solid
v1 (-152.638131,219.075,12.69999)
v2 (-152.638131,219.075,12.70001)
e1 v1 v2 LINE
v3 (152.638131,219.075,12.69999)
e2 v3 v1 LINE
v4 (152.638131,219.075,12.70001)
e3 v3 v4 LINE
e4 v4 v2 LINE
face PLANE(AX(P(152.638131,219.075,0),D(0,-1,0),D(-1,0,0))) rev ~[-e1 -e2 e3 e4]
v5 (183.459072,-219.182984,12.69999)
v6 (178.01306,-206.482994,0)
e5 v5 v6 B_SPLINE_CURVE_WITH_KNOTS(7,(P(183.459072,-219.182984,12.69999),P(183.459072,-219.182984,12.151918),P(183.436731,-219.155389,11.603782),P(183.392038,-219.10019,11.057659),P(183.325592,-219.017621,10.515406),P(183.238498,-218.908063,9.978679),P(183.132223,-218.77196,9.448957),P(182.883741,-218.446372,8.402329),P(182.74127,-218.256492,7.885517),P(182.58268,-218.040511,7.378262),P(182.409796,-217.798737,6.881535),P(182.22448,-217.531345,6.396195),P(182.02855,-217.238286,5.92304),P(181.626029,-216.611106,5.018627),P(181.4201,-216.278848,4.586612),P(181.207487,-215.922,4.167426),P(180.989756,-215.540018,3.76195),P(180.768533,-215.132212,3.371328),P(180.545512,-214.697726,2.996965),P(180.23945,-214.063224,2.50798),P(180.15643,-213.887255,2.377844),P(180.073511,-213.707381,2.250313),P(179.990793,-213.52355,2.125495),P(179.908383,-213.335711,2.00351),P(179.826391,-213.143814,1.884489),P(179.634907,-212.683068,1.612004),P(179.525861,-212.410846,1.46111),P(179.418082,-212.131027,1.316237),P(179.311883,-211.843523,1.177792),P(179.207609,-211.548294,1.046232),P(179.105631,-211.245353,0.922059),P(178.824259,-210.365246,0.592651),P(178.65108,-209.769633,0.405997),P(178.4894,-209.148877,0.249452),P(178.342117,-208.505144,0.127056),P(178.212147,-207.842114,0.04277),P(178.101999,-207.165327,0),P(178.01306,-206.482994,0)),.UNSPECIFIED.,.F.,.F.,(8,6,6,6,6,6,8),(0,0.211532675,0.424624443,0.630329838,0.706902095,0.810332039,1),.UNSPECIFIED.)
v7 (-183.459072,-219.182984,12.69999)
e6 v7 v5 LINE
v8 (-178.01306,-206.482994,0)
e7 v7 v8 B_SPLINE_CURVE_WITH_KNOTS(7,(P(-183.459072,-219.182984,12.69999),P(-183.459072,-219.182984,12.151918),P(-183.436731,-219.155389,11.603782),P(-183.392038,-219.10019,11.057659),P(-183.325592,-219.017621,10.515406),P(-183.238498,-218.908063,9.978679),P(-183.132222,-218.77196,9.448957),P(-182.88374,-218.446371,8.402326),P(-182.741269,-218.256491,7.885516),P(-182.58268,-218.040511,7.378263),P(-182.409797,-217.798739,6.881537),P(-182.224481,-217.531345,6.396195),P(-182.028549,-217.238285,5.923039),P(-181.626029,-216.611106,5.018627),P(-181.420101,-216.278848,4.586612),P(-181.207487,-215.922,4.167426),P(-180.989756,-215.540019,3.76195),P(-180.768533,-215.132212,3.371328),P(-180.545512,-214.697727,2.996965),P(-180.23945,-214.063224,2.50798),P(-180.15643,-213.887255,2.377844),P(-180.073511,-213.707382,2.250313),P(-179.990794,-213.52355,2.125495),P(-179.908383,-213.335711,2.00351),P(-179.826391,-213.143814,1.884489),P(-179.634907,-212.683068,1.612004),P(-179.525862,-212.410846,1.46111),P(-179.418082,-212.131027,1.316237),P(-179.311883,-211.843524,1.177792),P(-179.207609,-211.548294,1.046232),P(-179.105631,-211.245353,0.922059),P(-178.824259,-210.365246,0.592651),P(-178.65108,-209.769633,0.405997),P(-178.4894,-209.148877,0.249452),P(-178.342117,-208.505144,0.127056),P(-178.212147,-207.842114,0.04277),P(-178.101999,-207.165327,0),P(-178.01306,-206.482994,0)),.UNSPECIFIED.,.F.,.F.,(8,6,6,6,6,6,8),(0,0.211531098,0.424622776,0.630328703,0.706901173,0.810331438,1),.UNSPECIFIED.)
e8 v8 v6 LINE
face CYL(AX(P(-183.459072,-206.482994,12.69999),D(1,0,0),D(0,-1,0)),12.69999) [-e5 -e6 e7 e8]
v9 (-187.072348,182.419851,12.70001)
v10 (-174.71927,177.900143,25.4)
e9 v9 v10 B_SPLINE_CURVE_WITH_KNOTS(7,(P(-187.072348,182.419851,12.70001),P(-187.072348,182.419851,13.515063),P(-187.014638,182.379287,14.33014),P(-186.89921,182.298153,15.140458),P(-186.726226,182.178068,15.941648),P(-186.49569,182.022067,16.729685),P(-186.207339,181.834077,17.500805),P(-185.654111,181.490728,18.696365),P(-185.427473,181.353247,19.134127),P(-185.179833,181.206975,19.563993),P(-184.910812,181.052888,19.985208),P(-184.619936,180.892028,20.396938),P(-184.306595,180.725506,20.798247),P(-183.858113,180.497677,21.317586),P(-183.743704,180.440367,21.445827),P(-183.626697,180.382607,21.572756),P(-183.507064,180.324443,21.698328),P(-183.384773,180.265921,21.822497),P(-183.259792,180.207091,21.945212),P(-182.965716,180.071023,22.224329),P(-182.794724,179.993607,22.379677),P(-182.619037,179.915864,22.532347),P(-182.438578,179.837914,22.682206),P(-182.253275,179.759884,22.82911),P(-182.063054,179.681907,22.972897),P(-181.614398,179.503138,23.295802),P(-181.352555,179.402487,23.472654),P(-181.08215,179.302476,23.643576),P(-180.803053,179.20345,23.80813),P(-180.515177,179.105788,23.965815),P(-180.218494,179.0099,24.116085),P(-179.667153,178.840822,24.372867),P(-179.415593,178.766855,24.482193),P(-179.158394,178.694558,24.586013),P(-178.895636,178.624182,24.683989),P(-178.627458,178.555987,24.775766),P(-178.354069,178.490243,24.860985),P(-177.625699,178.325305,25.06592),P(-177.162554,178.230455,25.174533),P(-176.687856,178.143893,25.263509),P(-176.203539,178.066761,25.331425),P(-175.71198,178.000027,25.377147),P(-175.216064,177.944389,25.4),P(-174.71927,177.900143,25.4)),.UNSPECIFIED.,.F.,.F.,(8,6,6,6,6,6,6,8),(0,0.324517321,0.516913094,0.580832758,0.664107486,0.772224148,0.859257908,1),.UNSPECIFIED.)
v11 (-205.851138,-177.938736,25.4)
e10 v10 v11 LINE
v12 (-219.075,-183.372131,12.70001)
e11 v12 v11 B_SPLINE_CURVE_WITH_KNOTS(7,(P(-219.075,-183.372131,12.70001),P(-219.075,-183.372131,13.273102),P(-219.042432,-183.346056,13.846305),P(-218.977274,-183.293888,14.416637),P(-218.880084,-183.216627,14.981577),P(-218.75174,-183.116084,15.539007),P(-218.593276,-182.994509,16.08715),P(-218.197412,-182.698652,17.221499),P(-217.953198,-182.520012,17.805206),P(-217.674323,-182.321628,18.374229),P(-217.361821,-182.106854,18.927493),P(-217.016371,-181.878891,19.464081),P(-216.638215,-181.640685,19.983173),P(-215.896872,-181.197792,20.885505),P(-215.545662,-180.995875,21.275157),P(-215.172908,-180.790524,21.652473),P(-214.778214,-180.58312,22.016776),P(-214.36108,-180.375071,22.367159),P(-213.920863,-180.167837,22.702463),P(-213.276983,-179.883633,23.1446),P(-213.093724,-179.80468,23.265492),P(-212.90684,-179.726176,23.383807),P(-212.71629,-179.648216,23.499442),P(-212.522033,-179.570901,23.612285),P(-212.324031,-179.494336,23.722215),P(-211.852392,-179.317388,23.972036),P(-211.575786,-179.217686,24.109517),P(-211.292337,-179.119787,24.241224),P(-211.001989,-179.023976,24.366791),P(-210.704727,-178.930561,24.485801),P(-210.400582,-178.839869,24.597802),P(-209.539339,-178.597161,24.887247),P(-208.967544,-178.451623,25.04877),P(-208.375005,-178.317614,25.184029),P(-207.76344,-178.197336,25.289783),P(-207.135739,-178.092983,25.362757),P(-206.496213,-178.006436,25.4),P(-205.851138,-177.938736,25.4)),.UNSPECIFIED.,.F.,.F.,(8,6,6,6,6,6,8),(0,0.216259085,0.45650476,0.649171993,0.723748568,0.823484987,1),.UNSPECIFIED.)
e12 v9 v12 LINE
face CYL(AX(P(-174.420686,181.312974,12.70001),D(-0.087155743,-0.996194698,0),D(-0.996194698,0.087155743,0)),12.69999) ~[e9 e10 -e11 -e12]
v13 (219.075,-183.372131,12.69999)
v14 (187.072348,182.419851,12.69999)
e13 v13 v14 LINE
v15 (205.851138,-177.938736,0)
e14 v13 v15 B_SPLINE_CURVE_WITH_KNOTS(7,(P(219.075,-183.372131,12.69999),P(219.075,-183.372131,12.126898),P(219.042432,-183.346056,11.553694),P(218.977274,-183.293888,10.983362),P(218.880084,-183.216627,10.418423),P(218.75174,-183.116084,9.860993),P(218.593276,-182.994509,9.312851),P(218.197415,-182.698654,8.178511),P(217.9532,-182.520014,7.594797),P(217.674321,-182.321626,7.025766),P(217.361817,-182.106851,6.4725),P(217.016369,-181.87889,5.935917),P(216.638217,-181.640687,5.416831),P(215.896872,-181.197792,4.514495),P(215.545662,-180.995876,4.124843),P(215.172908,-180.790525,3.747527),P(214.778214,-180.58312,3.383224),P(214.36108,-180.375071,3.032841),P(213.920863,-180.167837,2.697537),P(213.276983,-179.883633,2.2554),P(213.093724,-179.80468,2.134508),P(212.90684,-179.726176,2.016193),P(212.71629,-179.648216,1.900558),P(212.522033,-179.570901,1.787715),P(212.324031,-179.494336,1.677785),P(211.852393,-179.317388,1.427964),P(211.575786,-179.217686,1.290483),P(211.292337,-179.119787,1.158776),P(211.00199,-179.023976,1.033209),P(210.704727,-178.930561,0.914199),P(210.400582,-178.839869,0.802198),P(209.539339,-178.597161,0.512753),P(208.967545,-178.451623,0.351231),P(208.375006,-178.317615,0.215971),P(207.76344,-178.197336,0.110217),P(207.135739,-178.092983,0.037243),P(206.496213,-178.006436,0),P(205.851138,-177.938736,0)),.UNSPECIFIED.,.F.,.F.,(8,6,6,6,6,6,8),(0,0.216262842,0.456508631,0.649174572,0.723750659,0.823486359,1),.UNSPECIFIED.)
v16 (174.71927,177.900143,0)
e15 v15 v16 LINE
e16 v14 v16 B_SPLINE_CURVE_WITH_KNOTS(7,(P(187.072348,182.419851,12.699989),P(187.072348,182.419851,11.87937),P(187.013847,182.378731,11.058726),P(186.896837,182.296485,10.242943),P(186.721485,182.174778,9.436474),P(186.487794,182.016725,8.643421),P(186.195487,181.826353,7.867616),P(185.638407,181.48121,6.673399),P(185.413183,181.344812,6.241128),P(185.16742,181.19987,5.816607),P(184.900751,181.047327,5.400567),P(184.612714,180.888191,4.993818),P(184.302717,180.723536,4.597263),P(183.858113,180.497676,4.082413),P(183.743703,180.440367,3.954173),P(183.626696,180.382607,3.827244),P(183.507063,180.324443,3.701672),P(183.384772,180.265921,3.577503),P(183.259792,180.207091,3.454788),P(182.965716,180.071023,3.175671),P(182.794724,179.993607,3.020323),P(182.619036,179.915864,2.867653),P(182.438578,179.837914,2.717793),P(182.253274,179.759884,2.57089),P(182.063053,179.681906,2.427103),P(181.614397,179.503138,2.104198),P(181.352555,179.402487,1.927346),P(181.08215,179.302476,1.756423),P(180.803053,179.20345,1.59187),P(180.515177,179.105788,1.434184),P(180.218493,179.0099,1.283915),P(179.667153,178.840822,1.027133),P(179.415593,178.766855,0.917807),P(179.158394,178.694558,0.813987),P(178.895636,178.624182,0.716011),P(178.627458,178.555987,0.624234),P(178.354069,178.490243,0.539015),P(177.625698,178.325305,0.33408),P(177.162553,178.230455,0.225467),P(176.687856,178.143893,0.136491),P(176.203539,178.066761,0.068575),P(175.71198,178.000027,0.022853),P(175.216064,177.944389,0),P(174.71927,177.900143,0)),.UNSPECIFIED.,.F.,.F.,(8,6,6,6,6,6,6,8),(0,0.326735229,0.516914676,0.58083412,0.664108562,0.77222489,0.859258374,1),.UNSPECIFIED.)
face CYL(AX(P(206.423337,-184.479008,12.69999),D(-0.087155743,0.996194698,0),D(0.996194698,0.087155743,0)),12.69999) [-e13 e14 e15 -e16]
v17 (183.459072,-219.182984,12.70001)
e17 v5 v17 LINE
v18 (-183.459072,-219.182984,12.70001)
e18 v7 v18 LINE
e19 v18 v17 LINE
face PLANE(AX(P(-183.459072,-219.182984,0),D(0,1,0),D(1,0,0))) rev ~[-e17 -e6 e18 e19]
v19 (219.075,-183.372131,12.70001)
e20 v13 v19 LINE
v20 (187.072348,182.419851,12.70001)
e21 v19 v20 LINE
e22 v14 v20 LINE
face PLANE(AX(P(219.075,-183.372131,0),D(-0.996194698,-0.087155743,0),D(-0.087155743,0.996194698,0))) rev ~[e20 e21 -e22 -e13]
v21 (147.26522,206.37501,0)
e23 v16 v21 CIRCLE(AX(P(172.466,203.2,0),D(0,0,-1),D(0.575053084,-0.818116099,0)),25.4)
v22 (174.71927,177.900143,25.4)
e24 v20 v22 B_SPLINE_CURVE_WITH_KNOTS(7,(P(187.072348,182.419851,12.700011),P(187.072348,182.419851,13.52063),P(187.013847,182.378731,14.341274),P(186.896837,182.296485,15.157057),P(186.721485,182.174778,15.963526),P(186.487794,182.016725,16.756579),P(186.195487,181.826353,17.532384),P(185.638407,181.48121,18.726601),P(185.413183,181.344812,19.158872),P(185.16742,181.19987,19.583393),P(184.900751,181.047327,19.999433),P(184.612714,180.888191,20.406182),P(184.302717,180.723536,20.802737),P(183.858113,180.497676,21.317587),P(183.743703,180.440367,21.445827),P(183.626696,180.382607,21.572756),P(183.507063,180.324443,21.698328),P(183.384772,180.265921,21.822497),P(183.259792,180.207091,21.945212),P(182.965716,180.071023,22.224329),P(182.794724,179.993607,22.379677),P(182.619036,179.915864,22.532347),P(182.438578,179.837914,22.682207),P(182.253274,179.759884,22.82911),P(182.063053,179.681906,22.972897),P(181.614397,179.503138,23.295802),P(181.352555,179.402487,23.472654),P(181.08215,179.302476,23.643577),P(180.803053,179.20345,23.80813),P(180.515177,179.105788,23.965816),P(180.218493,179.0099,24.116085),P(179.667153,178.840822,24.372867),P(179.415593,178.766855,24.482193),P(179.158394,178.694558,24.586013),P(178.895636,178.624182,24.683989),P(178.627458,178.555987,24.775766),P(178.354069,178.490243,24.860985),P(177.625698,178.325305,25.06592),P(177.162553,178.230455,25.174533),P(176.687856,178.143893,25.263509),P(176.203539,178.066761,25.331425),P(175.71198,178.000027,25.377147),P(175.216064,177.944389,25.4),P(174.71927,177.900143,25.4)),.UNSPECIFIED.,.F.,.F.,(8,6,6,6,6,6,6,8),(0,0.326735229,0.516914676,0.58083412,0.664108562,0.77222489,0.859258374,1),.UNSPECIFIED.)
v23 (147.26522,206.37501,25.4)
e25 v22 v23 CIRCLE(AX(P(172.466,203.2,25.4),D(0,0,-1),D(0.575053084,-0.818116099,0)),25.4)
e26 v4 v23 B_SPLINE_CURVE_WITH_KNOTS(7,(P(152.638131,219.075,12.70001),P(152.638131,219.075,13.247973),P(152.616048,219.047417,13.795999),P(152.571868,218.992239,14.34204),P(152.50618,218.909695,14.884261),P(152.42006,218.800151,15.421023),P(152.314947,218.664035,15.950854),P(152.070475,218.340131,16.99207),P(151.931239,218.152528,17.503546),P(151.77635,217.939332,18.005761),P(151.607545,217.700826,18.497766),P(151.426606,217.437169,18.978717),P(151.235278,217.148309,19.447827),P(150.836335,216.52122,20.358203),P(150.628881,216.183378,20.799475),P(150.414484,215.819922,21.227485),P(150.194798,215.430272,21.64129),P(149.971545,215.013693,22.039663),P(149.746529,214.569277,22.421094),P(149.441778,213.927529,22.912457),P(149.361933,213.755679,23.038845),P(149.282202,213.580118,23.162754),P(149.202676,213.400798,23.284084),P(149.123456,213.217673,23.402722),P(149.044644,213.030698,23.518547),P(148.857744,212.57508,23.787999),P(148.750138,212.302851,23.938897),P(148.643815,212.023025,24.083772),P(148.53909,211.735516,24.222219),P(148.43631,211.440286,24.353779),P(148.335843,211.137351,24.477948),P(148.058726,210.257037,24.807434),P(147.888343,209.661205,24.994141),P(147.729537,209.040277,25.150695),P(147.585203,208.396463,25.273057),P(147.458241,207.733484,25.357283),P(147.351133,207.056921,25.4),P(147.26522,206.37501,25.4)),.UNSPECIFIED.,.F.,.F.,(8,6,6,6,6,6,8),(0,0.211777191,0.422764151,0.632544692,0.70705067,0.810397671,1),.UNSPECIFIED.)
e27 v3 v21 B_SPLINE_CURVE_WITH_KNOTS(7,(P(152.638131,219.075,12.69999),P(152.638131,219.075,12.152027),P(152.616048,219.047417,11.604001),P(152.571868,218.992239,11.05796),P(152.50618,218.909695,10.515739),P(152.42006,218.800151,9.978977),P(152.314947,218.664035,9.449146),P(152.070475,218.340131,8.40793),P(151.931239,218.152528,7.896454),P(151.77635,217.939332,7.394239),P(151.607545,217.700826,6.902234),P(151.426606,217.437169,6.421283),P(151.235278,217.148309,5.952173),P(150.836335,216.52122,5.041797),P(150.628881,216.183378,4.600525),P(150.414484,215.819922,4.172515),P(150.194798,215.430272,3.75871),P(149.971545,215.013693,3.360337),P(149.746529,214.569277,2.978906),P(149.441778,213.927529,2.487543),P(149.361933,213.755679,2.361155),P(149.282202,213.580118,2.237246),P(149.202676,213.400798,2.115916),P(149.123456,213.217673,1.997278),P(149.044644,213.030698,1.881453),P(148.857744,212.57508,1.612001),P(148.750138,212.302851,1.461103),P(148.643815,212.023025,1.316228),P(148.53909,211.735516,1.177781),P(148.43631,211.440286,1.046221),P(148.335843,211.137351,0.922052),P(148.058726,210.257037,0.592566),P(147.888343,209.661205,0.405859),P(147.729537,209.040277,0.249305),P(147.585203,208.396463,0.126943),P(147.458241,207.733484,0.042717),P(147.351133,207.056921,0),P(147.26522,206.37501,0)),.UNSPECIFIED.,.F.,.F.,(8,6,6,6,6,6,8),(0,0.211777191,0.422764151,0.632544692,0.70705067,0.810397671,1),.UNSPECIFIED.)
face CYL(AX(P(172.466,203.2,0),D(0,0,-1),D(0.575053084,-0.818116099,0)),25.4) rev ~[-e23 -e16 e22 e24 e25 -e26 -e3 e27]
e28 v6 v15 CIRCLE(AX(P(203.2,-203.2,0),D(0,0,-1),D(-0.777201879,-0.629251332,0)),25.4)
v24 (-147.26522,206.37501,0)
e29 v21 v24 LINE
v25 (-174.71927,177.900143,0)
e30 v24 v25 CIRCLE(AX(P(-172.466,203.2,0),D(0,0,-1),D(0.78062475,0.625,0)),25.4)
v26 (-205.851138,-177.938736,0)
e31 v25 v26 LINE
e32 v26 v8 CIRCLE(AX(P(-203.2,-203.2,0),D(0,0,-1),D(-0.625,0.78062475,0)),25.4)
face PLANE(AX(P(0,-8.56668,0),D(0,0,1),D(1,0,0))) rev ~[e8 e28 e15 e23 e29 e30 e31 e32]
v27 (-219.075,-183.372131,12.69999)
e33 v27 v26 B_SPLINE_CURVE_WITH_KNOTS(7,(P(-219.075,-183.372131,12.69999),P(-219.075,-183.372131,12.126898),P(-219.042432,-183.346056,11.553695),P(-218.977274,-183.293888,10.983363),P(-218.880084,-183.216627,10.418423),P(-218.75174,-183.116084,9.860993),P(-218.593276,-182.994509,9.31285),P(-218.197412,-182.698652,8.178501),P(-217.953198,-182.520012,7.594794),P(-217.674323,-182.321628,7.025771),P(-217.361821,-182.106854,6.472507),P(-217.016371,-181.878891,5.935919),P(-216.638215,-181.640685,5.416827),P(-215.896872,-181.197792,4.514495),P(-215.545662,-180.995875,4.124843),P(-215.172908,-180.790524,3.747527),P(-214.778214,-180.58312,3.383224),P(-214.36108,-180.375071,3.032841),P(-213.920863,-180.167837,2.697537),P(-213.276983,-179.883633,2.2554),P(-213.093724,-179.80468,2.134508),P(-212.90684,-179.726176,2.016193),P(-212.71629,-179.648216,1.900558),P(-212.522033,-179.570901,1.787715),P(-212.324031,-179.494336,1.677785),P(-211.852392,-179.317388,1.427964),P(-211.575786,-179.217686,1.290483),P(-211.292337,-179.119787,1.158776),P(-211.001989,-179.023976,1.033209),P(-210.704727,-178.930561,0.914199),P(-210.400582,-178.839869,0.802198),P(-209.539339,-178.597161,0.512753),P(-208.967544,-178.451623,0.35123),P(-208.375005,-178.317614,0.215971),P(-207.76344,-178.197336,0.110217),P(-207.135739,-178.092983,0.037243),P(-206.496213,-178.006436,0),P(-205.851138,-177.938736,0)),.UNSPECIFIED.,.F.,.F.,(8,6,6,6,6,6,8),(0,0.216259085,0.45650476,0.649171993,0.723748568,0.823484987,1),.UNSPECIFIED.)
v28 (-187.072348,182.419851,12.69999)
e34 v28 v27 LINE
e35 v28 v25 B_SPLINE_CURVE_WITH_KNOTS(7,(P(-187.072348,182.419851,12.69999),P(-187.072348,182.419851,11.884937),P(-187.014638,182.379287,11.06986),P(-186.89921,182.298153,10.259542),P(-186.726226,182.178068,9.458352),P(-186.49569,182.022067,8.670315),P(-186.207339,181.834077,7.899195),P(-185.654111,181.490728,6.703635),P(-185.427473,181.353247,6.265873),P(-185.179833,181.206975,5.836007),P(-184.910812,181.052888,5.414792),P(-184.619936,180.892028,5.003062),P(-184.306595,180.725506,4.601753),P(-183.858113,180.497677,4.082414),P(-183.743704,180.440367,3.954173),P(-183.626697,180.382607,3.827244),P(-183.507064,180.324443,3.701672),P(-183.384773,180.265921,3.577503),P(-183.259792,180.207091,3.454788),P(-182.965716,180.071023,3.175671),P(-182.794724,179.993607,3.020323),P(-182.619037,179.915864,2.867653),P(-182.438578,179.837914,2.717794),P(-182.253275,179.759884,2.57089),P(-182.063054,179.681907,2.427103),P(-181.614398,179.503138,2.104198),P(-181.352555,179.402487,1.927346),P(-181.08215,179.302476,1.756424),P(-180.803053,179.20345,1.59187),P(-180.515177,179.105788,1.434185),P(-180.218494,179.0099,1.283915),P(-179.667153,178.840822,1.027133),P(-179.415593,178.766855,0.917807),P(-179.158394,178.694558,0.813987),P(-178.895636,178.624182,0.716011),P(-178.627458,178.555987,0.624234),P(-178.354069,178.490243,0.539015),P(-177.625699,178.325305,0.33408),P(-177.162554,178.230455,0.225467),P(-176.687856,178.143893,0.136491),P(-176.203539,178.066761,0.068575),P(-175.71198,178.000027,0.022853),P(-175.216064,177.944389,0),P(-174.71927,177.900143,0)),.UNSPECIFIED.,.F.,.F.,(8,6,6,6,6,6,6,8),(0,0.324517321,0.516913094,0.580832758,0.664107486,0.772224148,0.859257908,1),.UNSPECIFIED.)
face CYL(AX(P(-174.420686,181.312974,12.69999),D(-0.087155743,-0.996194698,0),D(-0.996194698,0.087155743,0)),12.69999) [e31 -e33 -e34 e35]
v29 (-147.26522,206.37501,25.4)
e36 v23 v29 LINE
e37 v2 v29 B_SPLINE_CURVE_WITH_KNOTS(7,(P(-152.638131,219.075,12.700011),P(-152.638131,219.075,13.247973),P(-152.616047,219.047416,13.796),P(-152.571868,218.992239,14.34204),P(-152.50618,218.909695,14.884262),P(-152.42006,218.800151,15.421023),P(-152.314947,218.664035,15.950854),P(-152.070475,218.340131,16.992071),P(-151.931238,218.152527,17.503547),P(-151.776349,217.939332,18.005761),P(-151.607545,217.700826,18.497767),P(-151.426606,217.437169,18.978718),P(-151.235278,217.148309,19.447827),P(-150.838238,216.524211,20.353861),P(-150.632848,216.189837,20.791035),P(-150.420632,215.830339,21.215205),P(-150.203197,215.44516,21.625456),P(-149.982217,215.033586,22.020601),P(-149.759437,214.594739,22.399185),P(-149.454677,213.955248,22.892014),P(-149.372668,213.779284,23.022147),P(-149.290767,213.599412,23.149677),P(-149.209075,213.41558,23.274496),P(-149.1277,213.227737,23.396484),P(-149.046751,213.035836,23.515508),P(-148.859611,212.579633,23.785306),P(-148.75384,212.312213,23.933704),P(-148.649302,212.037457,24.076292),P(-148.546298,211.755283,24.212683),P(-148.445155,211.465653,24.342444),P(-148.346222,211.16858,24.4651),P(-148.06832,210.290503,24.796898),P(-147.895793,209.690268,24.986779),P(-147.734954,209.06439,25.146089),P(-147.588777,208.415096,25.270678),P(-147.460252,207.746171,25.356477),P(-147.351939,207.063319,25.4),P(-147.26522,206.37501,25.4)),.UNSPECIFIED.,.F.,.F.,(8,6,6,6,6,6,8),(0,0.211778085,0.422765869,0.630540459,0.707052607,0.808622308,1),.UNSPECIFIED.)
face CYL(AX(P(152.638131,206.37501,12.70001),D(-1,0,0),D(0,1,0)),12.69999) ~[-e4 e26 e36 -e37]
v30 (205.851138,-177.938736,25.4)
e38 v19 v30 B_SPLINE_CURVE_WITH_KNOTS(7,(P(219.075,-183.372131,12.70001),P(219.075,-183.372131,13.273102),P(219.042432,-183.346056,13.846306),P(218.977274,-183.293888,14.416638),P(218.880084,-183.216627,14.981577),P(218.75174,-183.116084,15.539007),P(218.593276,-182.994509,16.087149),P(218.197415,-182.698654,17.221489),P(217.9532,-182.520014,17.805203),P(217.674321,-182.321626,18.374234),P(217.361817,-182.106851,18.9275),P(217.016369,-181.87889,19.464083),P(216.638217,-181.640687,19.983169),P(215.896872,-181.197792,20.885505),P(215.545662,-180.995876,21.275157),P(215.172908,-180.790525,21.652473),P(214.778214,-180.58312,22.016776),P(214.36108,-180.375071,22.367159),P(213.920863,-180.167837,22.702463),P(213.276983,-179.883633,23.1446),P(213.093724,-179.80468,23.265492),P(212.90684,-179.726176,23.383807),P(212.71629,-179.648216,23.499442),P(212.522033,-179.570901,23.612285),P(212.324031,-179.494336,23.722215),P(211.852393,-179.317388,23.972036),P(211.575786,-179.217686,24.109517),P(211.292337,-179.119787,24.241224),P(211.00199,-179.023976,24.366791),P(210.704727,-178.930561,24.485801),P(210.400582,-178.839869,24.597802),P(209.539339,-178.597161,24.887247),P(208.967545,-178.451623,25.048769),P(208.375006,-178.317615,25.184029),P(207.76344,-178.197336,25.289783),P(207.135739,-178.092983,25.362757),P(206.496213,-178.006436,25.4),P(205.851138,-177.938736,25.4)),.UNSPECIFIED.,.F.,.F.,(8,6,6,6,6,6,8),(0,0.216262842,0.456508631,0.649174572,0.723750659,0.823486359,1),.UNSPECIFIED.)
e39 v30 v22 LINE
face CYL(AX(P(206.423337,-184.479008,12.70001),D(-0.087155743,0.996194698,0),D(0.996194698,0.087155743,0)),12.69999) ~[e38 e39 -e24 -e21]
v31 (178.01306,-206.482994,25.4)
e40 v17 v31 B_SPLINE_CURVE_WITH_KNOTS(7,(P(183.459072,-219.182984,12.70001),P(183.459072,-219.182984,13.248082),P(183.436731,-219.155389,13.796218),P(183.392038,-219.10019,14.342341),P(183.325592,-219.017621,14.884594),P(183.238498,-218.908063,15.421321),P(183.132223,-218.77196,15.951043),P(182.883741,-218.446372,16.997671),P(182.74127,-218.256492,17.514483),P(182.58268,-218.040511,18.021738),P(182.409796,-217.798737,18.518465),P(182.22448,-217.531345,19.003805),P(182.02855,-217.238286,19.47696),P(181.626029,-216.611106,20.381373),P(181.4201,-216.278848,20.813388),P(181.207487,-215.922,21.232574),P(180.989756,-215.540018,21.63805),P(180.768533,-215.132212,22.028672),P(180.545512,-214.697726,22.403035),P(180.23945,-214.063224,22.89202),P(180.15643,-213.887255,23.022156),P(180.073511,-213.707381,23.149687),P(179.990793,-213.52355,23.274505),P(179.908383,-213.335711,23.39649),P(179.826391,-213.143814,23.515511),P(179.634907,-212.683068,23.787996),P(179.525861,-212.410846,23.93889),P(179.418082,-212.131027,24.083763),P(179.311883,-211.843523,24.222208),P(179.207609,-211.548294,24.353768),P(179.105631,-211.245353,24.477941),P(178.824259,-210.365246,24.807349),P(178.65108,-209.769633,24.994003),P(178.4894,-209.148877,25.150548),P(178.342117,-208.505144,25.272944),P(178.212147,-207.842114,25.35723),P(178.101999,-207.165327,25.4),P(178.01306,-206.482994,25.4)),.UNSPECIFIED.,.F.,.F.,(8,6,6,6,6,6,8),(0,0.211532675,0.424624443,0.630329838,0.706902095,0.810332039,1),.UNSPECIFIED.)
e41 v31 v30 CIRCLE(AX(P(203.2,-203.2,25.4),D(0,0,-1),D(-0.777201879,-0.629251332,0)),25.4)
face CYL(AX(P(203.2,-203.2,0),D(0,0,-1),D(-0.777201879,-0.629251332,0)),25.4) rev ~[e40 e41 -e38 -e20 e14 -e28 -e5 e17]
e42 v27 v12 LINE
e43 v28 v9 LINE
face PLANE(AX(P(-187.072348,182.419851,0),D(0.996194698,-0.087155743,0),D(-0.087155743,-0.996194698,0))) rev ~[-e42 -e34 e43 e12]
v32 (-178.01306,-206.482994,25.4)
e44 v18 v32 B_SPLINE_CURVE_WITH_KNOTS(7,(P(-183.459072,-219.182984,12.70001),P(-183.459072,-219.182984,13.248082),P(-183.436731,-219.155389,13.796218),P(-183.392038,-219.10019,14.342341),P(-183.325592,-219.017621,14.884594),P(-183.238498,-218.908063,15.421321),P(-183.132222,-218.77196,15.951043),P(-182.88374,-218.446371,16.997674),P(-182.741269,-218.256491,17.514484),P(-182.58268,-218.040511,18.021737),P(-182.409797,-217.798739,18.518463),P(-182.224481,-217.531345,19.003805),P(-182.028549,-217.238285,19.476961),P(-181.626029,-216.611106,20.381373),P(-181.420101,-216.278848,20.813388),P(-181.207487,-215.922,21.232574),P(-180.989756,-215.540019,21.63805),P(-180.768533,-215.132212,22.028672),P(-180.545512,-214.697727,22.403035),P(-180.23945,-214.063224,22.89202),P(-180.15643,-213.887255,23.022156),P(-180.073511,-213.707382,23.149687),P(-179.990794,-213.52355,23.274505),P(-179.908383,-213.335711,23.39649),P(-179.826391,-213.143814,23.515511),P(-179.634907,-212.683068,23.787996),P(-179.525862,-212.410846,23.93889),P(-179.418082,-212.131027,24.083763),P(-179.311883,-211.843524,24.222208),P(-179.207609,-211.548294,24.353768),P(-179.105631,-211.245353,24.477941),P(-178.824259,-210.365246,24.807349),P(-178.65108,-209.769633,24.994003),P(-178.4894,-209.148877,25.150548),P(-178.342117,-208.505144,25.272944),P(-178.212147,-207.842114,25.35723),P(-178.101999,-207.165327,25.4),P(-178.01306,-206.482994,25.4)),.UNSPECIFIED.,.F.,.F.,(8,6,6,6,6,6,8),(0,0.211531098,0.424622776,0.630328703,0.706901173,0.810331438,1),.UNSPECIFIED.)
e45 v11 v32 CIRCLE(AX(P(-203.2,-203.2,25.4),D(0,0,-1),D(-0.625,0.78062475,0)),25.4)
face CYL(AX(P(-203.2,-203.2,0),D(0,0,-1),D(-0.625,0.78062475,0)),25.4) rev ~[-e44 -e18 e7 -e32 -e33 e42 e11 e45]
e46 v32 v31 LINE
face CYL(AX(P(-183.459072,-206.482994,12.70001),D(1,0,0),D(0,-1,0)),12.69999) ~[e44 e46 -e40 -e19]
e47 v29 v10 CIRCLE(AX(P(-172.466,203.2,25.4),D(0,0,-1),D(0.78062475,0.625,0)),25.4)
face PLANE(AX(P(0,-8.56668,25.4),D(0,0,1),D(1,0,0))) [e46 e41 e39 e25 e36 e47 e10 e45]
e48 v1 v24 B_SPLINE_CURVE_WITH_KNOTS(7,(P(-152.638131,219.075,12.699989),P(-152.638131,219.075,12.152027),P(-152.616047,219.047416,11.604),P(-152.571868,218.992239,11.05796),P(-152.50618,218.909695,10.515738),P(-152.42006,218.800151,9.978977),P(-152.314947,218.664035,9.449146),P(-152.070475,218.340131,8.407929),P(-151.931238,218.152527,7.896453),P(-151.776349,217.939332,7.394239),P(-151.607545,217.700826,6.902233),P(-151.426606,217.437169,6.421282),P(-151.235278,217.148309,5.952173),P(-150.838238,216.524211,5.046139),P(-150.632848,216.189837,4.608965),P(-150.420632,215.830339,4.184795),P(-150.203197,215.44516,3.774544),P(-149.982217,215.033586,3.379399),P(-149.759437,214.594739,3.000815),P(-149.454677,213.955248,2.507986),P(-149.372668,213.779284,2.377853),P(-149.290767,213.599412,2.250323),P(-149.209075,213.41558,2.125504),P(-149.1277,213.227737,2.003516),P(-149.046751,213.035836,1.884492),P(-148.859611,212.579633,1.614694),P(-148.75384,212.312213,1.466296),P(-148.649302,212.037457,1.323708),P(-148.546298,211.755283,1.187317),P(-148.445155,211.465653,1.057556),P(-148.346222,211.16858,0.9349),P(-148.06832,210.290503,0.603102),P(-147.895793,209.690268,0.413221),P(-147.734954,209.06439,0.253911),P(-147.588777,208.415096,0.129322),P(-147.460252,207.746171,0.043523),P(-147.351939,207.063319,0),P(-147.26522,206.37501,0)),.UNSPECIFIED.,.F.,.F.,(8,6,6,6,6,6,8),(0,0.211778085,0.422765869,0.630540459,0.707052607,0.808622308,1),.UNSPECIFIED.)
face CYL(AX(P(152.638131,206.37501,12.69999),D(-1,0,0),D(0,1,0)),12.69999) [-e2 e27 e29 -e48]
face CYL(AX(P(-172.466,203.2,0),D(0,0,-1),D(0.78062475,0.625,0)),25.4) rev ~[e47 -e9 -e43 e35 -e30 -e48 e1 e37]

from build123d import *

# Parameters (mm, degrees)
F1_DEPTH = 25.4
F2_R     = 12.69999


# Not quite as in the source:
# - a fillet or chamfer is up to 0.001 mm smaller than in the source, because OpenCascade refuses the exact size


with BuildPart() as f1:
    # F0 (on Top) → F1 (new body)
    with BuildSketch(Plane.XY):
        with BuildLine():
            ThreePointArc((-219.075, -183.3721313551), (-185.1905403178, -185.2885689585), (-183.4590722629, -219.182983829))
            Line((-183.4590722629, -219.182983829), (183.4590722629, -219.182983829))
            ThreePointArc((183.4590722629, -219.182983829), (185.1905403178, -185.2885689585), (219.075, -183.3721313551))
            Line((219.075, -183.3721313551), (187.072348327, 182.4198510941))
            ThreePointArc((187.072348327, 182.4198510941), (153.9534082329, 185.8090843811), (152.6381313551, 219.075))
            Line((152.6381313551, 219.075), (-152.6381313551, 219.075))
            ThreePointArc((-152.6381313551, 219.075), (-153.9534082329, 185.8090843811), (-187.072348327, 182.4198510941))
            Line((-187.072348327, 182.4198510941), (-219.075, -183.3721313551))
        make_face()
    extrude(amount=F1_DEPTH)

    # F2 (radius 12.7 in the source; OpenCascade refuses exactly that, so slightly less here)
    f2_edges = [f1.edges().sort_by_distance(p)[0] for p in [
        (-203.073674, -0.47614, 25.4),
        (0, 219.075, 25.4),
        (0, -219.182984, 25.4),
        (203.073674, -0.47614, 25.4),
        (-203.073674, -0.47614, 0),
        (0, -219.182984, 0),
        (0, 219.075, 0),
        (203.073674, -0.47614, 0),
    ]]
    fillet(f2_edges, radius=F2_R)


solid = f1.part
